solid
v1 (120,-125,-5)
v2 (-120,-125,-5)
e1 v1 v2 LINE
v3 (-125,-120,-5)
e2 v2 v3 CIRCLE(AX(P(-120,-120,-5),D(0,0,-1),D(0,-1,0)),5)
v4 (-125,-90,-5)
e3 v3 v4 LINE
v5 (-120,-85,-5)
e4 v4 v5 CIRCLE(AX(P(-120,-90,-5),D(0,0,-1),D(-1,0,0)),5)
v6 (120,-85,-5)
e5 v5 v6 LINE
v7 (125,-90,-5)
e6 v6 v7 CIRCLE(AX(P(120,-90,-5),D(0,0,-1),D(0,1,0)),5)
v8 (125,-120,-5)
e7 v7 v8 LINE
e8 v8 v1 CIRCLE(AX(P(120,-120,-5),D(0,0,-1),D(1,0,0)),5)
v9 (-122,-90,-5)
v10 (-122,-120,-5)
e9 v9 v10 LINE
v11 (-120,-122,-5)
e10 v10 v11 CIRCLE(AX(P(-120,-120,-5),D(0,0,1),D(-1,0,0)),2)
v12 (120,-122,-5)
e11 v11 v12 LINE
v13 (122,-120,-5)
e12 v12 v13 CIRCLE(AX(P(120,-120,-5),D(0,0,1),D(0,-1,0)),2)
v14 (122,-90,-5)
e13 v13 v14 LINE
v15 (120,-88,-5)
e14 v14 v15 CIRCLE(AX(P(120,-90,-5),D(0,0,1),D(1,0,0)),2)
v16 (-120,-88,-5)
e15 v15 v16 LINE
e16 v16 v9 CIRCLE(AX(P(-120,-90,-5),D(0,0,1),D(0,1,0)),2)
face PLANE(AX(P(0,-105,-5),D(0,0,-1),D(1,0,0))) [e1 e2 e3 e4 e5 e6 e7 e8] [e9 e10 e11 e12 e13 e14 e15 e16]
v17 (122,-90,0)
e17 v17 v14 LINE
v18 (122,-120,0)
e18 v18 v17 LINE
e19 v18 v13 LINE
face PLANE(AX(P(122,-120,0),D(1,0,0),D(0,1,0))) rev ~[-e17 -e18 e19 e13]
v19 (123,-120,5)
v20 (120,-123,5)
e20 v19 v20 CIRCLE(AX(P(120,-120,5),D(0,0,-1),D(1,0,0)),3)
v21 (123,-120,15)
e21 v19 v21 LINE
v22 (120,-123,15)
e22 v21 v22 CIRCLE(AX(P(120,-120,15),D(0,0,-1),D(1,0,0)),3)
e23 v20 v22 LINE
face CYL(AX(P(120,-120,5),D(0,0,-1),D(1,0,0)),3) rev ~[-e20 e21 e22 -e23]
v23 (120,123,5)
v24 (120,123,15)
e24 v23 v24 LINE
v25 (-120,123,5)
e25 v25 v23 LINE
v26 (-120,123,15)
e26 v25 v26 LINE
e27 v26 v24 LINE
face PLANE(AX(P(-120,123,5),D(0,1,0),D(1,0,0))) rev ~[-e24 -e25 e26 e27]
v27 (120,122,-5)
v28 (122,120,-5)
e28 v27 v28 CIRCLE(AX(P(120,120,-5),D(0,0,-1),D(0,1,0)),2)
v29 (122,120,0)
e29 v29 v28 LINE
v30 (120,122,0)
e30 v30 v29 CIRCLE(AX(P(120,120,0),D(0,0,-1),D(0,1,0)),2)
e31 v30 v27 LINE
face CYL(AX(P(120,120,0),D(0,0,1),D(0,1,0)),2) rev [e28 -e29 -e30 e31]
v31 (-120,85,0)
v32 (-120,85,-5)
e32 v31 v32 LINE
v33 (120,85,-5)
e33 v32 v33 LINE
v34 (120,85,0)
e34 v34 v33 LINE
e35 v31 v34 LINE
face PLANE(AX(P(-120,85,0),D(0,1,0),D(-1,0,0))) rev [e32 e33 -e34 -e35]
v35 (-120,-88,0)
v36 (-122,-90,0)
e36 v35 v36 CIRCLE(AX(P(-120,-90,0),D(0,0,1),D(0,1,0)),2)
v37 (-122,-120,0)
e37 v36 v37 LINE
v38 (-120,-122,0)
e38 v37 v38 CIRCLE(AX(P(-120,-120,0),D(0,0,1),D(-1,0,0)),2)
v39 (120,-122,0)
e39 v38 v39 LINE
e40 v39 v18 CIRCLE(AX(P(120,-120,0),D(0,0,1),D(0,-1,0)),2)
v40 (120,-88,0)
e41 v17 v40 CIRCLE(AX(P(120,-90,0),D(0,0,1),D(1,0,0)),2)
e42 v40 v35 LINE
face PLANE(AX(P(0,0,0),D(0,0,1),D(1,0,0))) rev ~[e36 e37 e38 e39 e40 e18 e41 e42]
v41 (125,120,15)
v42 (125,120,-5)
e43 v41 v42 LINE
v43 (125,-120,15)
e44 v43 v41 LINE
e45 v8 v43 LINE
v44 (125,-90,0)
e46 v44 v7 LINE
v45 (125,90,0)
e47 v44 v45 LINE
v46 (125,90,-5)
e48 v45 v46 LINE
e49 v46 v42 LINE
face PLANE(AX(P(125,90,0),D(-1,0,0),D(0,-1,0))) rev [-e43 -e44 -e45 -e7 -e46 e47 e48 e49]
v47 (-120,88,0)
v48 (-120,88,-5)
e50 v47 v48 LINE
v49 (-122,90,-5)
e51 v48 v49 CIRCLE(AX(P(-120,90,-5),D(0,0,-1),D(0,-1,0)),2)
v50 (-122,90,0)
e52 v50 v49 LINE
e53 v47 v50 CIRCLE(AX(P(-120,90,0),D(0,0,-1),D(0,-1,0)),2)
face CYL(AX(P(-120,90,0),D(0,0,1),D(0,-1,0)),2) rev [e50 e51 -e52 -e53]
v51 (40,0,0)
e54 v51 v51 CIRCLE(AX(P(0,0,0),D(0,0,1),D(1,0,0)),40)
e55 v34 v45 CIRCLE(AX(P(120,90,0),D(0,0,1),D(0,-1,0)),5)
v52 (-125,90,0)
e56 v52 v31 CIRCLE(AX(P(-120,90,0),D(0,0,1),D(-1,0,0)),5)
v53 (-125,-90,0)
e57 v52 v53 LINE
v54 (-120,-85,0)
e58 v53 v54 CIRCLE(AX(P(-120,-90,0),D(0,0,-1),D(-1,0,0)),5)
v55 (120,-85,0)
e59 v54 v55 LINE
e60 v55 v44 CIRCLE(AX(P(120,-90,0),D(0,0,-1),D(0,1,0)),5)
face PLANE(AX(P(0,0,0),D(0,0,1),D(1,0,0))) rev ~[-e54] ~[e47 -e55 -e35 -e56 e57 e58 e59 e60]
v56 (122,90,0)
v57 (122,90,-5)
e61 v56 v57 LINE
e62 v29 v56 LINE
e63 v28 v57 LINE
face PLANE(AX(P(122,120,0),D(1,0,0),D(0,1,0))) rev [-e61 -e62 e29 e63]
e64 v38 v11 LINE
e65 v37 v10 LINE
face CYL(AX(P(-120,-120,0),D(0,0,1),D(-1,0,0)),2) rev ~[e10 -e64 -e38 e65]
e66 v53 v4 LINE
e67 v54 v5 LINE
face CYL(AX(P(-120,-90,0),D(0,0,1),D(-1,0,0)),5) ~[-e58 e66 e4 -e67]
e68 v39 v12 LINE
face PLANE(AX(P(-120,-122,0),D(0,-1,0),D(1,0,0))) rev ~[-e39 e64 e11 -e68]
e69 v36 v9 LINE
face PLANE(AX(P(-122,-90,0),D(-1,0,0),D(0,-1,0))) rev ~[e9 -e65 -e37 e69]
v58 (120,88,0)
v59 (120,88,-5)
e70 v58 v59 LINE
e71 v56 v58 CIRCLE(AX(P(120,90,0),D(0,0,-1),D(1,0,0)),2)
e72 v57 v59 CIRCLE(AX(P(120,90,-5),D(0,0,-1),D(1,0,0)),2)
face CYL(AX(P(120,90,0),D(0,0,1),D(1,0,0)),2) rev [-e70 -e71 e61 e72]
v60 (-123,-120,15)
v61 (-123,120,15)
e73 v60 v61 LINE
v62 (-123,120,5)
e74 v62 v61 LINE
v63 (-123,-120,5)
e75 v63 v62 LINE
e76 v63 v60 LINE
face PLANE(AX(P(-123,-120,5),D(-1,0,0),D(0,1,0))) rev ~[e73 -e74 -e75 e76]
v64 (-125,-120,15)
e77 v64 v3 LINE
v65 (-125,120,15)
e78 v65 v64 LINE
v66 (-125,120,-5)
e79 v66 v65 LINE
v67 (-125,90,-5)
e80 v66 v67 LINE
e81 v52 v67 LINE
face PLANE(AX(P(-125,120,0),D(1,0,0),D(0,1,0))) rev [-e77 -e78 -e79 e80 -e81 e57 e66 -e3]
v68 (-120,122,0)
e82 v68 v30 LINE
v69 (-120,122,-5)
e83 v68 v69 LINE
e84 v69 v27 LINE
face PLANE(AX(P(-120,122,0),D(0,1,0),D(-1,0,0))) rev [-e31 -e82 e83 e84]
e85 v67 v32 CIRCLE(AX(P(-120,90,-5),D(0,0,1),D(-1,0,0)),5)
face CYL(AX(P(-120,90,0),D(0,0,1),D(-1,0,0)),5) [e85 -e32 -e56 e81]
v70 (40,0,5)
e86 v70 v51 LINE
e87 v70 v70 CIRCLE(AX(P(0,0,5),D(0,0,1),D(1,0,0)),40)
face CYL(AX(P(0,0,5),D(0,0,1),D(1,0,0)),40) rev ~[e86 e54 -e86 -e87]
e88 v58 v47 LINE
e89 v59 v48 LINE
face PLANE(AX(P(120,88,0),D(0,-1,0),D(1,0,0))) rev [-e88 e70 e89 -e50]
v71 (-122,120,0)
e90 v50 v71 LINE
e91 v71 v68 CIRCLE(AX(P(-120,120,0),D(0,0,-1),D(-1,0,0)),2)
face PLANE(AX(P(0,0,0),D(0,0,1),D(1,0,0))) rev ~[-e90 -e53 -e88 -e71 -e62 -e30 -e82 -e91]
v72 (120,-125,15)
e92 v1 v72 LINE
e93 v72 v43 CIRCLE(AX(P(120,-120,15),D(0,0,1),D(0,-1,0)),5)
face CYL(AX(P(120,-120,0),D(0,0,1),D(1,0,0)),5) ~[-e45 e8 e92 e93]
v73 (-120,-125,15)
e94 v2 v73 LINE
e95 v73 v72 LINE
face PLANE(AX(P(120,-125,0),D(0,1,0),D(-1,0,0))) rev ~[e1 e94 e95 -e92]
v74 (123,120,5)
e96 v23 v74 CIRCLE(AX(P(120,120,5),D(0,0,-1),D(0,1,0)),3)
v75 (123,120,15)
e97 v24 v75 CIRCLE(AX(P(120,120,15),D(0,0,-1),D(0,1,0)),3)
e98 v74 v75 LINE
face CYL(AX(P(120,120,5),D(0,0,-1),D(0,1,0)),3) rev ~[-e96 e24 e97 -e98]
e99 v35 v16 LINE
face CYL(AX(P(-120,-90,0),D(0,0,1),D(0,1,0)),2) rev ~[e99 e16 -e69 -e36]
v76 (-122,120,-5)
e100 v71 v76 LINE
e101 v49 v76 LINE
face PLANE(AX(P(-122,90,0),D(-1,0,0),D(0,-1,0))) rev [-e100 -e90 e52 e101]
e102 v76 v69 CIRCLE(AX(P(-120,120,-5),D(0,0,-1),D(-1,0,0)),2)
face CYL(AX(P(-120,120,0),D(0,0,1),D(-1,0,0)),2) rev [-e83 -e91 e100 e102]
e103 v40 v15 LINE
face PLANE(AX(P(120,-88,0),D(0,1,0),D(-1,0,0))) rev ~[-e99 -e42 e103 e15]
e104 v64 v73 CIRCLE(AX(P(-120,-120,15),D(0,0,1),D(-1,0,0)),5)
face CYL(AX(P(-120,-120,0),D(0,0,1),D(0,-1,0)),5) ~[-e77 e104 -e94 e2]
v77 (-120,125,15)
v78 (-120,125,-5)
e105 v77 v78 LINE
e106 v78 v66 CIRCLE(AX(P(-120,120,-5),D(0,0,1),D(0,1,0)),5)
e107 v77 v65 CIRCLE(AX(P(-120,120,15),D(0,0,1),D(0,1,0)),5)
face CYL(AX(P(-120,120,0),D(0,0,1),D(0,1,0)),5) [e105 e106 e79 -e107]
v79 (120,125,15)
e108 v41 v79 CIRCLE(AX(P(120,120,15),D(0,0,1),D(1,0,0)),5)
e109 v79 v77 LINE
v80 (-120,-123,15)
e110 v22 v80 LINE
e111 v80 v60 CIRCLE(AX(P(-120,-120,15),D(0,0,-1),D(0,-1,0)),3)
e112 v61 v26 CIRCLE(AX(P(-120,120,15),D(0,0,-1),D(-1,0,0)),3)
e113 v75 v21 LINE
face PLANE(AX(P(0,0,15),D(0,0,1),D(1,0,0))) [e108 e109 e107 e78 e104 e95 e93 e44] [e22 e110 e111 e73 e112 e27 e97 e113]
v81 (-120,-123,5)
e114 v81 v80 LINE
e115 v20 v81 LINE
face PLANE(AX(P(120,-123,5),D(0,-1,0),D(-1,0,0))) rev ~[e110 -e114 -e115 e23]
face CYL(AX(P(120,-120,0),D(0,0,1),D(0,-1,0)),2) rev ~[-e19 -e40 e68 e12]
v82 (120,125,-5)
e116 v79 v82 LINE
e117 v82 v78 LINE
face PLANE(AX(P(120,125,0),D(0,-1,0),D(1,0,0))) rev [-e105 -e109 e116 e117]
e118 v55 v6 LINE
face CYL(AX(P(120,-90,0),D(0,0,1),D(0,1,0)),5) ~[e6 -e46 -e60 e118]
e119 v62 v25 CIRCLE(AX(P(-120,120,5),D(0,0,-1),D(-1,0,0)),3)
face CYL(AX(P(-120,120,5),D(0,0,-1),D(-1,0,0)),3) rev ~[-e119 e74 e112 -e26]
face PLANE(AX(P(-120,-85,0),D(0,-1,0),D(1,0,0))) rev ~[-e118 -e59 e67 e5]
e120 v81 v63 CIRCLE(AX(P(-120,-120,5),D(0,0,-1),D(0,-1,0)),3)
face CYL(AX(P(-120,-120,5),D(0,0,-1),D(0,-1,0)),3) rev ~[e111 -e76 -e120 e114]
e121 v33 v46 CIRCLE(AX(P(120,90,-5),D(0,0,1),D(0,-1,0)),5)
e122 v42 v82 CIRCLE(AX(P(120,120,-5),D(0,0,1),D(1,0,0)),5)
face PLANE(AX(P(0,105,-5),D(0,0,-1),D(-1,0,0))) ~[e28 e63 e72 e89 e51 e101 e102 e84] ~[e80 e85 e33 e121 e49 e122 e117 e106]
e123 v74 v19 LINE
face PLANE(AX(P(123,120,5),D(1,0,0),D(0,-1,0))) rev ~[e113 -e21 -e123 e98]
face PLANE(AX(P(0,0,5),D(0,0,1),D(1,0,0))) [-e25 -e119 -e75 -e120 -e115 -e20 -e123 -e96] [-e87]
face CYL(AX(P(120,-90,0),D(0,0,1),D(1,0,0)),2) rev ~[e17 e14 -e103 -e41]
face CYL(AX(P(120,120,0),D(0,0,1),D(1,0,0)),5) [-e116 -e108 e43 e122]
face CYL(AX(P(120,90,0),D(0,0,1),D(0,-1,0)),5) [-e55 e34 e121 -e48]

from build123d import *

# Parameters (mm, degrees)
F1_DEPTH = 5
F3_DEPTH = 10
F4_R     = 40
F5_DEPTH = 5.001
F7_DEPTH = 5


# Not quite as in the source:
# - a pattern or mirror of a feature is missing from the dataset's text; its kind, count and spacing are read off the source's solid


with BuildPart() as f1:
    # F0 (on Top) → F1 (new body)
    with BuildSketch(Plane.XY):
        with BuildLine():
            ThreePointArc((125, 120), (123.5355339059, 123.5355339059), (120, 125))
            Line((120, 125), (-120, 125))
            ThreePointArc((-120, 125), (-123.5355339059, 123.5355339059), (-125, 120))
            Line((-125, 120), (-125, -120))
            ThreePointArc((-125, -120), (-123.5355339059, -123.5355339059), (-120, -125))
            Line((-120, -125), (120, -125))
            ThreePointArc((120, -125), (123.5355339059, -123.5355339059), (125, -120))
            Line((125, -120), (125, 120))
        make_face()
    extrude(amount=F1_DEPTH)

    # F2 (on face) → F3 (join)
    with BuildSketch(Plane.XY.offset(5)):
        with BuildLine():
            ThreePointArc((-120, 125), (-123.5355339059, 123.5355339059), (-125, 120))
            Line((-125, 120), (-125, -120))
            ThreePointArc((-125, -120), (-123.5355339059, -123.5355339059), (-120, -125))
            Line((-120, -125), (120, -125))
            ThreePointArc((120, -125), (123.5355339059, -123.5355339059), (125, -120))
            Line((125, -120), (125, 120))
            ThreePointArc((125, 120), (123.5355339059, 123.5355339059), (120, 125))
            Line((120, 125), (-120, 125))
        make_face()
        with BuildLine():
            Line((-120, 123), (120, 123))
            ThreePointArc((120, 123), (122.1213203436, 122.1213203436), (123, 120))
            Line((123, 120), (123, -120))
            ThreePointArc((123, -120), (122.1213203436, -122.1213203436), (120, -123))
            Line((120, -123), (-120, -123))
            ThreePointArc((-120, -123), (-122.1213203436, -122.1213203436), (-123, -120))
            Line((-123, -120), (-123, 120))
            ThreePointArc((-123, 120), (-122.1213203436, 122.1213203436), (-120, 123))
        make_face(mode=Mode.SUBTRACT)
    extrude(amount=F3_DEPTH)

    # F4 (on face) → F5 (cut, through all)
    with BuildSketch(Plane.XY.offset(5)):
        Circle(F4_R)
    extrude(amount=-F5_DEPTH, mode=Mode.SUBTRACT)

    # F6 (on face) → F7 (join)
    with BuildSketch(Plane(origin=(0, 0, 0), x_dir=(1, 0, 0), z_dir=(0, 0, -1))):
        with BuildLine():
            ThreePointArc((-120, 125), (-123.5355339059, 123.5355339059), (-125, 120))
            Line((-125, 120), (-125, 90))
            ThreePointArc((-125, 90), (-123.5355339059, 86.4644660941), (-120, 85))
            Line((-120, 85), (120, 85))
            ThreePointArc((120, 85), (123.5355339059, 86.4644660941), (125, 90))
            Line((125, 90), (125, 120))
            ThreePointArc((125, 120), (123.5355339059, 123.5355339059), (120, 125))
            Line((120, 125), (-120, 125))
        make_face()
        with BuildLine():
            Line((-122, 90), (-122, 120))
            ThreePointArc((-122, 120), (-121.4142135624, 121.4142135624), (-120, 122))
            Line((-120, 122), (120, 122))
            ThreePointArc((120, 122), (121.4142135624, 121.4142135624), (122, 120))
            Line((122, 120), (122, 90))
            ThreePointArc((122, 90), (121.4142135624, 88.5857864376), (120, 88))
            Line((120, 88), (-120, 88))
            ThreePointArc((-120, 88), (-121.4142135624, 88.5857864376), (-122, 90))
        make_face(mode=Mode.SUBTRACT)
    f7 = extrude(amount=F7_DEPTH)

    # F7_copies: F7 across plane
    add(f7.mirror(Plane.ZX))


solid = f1.part
